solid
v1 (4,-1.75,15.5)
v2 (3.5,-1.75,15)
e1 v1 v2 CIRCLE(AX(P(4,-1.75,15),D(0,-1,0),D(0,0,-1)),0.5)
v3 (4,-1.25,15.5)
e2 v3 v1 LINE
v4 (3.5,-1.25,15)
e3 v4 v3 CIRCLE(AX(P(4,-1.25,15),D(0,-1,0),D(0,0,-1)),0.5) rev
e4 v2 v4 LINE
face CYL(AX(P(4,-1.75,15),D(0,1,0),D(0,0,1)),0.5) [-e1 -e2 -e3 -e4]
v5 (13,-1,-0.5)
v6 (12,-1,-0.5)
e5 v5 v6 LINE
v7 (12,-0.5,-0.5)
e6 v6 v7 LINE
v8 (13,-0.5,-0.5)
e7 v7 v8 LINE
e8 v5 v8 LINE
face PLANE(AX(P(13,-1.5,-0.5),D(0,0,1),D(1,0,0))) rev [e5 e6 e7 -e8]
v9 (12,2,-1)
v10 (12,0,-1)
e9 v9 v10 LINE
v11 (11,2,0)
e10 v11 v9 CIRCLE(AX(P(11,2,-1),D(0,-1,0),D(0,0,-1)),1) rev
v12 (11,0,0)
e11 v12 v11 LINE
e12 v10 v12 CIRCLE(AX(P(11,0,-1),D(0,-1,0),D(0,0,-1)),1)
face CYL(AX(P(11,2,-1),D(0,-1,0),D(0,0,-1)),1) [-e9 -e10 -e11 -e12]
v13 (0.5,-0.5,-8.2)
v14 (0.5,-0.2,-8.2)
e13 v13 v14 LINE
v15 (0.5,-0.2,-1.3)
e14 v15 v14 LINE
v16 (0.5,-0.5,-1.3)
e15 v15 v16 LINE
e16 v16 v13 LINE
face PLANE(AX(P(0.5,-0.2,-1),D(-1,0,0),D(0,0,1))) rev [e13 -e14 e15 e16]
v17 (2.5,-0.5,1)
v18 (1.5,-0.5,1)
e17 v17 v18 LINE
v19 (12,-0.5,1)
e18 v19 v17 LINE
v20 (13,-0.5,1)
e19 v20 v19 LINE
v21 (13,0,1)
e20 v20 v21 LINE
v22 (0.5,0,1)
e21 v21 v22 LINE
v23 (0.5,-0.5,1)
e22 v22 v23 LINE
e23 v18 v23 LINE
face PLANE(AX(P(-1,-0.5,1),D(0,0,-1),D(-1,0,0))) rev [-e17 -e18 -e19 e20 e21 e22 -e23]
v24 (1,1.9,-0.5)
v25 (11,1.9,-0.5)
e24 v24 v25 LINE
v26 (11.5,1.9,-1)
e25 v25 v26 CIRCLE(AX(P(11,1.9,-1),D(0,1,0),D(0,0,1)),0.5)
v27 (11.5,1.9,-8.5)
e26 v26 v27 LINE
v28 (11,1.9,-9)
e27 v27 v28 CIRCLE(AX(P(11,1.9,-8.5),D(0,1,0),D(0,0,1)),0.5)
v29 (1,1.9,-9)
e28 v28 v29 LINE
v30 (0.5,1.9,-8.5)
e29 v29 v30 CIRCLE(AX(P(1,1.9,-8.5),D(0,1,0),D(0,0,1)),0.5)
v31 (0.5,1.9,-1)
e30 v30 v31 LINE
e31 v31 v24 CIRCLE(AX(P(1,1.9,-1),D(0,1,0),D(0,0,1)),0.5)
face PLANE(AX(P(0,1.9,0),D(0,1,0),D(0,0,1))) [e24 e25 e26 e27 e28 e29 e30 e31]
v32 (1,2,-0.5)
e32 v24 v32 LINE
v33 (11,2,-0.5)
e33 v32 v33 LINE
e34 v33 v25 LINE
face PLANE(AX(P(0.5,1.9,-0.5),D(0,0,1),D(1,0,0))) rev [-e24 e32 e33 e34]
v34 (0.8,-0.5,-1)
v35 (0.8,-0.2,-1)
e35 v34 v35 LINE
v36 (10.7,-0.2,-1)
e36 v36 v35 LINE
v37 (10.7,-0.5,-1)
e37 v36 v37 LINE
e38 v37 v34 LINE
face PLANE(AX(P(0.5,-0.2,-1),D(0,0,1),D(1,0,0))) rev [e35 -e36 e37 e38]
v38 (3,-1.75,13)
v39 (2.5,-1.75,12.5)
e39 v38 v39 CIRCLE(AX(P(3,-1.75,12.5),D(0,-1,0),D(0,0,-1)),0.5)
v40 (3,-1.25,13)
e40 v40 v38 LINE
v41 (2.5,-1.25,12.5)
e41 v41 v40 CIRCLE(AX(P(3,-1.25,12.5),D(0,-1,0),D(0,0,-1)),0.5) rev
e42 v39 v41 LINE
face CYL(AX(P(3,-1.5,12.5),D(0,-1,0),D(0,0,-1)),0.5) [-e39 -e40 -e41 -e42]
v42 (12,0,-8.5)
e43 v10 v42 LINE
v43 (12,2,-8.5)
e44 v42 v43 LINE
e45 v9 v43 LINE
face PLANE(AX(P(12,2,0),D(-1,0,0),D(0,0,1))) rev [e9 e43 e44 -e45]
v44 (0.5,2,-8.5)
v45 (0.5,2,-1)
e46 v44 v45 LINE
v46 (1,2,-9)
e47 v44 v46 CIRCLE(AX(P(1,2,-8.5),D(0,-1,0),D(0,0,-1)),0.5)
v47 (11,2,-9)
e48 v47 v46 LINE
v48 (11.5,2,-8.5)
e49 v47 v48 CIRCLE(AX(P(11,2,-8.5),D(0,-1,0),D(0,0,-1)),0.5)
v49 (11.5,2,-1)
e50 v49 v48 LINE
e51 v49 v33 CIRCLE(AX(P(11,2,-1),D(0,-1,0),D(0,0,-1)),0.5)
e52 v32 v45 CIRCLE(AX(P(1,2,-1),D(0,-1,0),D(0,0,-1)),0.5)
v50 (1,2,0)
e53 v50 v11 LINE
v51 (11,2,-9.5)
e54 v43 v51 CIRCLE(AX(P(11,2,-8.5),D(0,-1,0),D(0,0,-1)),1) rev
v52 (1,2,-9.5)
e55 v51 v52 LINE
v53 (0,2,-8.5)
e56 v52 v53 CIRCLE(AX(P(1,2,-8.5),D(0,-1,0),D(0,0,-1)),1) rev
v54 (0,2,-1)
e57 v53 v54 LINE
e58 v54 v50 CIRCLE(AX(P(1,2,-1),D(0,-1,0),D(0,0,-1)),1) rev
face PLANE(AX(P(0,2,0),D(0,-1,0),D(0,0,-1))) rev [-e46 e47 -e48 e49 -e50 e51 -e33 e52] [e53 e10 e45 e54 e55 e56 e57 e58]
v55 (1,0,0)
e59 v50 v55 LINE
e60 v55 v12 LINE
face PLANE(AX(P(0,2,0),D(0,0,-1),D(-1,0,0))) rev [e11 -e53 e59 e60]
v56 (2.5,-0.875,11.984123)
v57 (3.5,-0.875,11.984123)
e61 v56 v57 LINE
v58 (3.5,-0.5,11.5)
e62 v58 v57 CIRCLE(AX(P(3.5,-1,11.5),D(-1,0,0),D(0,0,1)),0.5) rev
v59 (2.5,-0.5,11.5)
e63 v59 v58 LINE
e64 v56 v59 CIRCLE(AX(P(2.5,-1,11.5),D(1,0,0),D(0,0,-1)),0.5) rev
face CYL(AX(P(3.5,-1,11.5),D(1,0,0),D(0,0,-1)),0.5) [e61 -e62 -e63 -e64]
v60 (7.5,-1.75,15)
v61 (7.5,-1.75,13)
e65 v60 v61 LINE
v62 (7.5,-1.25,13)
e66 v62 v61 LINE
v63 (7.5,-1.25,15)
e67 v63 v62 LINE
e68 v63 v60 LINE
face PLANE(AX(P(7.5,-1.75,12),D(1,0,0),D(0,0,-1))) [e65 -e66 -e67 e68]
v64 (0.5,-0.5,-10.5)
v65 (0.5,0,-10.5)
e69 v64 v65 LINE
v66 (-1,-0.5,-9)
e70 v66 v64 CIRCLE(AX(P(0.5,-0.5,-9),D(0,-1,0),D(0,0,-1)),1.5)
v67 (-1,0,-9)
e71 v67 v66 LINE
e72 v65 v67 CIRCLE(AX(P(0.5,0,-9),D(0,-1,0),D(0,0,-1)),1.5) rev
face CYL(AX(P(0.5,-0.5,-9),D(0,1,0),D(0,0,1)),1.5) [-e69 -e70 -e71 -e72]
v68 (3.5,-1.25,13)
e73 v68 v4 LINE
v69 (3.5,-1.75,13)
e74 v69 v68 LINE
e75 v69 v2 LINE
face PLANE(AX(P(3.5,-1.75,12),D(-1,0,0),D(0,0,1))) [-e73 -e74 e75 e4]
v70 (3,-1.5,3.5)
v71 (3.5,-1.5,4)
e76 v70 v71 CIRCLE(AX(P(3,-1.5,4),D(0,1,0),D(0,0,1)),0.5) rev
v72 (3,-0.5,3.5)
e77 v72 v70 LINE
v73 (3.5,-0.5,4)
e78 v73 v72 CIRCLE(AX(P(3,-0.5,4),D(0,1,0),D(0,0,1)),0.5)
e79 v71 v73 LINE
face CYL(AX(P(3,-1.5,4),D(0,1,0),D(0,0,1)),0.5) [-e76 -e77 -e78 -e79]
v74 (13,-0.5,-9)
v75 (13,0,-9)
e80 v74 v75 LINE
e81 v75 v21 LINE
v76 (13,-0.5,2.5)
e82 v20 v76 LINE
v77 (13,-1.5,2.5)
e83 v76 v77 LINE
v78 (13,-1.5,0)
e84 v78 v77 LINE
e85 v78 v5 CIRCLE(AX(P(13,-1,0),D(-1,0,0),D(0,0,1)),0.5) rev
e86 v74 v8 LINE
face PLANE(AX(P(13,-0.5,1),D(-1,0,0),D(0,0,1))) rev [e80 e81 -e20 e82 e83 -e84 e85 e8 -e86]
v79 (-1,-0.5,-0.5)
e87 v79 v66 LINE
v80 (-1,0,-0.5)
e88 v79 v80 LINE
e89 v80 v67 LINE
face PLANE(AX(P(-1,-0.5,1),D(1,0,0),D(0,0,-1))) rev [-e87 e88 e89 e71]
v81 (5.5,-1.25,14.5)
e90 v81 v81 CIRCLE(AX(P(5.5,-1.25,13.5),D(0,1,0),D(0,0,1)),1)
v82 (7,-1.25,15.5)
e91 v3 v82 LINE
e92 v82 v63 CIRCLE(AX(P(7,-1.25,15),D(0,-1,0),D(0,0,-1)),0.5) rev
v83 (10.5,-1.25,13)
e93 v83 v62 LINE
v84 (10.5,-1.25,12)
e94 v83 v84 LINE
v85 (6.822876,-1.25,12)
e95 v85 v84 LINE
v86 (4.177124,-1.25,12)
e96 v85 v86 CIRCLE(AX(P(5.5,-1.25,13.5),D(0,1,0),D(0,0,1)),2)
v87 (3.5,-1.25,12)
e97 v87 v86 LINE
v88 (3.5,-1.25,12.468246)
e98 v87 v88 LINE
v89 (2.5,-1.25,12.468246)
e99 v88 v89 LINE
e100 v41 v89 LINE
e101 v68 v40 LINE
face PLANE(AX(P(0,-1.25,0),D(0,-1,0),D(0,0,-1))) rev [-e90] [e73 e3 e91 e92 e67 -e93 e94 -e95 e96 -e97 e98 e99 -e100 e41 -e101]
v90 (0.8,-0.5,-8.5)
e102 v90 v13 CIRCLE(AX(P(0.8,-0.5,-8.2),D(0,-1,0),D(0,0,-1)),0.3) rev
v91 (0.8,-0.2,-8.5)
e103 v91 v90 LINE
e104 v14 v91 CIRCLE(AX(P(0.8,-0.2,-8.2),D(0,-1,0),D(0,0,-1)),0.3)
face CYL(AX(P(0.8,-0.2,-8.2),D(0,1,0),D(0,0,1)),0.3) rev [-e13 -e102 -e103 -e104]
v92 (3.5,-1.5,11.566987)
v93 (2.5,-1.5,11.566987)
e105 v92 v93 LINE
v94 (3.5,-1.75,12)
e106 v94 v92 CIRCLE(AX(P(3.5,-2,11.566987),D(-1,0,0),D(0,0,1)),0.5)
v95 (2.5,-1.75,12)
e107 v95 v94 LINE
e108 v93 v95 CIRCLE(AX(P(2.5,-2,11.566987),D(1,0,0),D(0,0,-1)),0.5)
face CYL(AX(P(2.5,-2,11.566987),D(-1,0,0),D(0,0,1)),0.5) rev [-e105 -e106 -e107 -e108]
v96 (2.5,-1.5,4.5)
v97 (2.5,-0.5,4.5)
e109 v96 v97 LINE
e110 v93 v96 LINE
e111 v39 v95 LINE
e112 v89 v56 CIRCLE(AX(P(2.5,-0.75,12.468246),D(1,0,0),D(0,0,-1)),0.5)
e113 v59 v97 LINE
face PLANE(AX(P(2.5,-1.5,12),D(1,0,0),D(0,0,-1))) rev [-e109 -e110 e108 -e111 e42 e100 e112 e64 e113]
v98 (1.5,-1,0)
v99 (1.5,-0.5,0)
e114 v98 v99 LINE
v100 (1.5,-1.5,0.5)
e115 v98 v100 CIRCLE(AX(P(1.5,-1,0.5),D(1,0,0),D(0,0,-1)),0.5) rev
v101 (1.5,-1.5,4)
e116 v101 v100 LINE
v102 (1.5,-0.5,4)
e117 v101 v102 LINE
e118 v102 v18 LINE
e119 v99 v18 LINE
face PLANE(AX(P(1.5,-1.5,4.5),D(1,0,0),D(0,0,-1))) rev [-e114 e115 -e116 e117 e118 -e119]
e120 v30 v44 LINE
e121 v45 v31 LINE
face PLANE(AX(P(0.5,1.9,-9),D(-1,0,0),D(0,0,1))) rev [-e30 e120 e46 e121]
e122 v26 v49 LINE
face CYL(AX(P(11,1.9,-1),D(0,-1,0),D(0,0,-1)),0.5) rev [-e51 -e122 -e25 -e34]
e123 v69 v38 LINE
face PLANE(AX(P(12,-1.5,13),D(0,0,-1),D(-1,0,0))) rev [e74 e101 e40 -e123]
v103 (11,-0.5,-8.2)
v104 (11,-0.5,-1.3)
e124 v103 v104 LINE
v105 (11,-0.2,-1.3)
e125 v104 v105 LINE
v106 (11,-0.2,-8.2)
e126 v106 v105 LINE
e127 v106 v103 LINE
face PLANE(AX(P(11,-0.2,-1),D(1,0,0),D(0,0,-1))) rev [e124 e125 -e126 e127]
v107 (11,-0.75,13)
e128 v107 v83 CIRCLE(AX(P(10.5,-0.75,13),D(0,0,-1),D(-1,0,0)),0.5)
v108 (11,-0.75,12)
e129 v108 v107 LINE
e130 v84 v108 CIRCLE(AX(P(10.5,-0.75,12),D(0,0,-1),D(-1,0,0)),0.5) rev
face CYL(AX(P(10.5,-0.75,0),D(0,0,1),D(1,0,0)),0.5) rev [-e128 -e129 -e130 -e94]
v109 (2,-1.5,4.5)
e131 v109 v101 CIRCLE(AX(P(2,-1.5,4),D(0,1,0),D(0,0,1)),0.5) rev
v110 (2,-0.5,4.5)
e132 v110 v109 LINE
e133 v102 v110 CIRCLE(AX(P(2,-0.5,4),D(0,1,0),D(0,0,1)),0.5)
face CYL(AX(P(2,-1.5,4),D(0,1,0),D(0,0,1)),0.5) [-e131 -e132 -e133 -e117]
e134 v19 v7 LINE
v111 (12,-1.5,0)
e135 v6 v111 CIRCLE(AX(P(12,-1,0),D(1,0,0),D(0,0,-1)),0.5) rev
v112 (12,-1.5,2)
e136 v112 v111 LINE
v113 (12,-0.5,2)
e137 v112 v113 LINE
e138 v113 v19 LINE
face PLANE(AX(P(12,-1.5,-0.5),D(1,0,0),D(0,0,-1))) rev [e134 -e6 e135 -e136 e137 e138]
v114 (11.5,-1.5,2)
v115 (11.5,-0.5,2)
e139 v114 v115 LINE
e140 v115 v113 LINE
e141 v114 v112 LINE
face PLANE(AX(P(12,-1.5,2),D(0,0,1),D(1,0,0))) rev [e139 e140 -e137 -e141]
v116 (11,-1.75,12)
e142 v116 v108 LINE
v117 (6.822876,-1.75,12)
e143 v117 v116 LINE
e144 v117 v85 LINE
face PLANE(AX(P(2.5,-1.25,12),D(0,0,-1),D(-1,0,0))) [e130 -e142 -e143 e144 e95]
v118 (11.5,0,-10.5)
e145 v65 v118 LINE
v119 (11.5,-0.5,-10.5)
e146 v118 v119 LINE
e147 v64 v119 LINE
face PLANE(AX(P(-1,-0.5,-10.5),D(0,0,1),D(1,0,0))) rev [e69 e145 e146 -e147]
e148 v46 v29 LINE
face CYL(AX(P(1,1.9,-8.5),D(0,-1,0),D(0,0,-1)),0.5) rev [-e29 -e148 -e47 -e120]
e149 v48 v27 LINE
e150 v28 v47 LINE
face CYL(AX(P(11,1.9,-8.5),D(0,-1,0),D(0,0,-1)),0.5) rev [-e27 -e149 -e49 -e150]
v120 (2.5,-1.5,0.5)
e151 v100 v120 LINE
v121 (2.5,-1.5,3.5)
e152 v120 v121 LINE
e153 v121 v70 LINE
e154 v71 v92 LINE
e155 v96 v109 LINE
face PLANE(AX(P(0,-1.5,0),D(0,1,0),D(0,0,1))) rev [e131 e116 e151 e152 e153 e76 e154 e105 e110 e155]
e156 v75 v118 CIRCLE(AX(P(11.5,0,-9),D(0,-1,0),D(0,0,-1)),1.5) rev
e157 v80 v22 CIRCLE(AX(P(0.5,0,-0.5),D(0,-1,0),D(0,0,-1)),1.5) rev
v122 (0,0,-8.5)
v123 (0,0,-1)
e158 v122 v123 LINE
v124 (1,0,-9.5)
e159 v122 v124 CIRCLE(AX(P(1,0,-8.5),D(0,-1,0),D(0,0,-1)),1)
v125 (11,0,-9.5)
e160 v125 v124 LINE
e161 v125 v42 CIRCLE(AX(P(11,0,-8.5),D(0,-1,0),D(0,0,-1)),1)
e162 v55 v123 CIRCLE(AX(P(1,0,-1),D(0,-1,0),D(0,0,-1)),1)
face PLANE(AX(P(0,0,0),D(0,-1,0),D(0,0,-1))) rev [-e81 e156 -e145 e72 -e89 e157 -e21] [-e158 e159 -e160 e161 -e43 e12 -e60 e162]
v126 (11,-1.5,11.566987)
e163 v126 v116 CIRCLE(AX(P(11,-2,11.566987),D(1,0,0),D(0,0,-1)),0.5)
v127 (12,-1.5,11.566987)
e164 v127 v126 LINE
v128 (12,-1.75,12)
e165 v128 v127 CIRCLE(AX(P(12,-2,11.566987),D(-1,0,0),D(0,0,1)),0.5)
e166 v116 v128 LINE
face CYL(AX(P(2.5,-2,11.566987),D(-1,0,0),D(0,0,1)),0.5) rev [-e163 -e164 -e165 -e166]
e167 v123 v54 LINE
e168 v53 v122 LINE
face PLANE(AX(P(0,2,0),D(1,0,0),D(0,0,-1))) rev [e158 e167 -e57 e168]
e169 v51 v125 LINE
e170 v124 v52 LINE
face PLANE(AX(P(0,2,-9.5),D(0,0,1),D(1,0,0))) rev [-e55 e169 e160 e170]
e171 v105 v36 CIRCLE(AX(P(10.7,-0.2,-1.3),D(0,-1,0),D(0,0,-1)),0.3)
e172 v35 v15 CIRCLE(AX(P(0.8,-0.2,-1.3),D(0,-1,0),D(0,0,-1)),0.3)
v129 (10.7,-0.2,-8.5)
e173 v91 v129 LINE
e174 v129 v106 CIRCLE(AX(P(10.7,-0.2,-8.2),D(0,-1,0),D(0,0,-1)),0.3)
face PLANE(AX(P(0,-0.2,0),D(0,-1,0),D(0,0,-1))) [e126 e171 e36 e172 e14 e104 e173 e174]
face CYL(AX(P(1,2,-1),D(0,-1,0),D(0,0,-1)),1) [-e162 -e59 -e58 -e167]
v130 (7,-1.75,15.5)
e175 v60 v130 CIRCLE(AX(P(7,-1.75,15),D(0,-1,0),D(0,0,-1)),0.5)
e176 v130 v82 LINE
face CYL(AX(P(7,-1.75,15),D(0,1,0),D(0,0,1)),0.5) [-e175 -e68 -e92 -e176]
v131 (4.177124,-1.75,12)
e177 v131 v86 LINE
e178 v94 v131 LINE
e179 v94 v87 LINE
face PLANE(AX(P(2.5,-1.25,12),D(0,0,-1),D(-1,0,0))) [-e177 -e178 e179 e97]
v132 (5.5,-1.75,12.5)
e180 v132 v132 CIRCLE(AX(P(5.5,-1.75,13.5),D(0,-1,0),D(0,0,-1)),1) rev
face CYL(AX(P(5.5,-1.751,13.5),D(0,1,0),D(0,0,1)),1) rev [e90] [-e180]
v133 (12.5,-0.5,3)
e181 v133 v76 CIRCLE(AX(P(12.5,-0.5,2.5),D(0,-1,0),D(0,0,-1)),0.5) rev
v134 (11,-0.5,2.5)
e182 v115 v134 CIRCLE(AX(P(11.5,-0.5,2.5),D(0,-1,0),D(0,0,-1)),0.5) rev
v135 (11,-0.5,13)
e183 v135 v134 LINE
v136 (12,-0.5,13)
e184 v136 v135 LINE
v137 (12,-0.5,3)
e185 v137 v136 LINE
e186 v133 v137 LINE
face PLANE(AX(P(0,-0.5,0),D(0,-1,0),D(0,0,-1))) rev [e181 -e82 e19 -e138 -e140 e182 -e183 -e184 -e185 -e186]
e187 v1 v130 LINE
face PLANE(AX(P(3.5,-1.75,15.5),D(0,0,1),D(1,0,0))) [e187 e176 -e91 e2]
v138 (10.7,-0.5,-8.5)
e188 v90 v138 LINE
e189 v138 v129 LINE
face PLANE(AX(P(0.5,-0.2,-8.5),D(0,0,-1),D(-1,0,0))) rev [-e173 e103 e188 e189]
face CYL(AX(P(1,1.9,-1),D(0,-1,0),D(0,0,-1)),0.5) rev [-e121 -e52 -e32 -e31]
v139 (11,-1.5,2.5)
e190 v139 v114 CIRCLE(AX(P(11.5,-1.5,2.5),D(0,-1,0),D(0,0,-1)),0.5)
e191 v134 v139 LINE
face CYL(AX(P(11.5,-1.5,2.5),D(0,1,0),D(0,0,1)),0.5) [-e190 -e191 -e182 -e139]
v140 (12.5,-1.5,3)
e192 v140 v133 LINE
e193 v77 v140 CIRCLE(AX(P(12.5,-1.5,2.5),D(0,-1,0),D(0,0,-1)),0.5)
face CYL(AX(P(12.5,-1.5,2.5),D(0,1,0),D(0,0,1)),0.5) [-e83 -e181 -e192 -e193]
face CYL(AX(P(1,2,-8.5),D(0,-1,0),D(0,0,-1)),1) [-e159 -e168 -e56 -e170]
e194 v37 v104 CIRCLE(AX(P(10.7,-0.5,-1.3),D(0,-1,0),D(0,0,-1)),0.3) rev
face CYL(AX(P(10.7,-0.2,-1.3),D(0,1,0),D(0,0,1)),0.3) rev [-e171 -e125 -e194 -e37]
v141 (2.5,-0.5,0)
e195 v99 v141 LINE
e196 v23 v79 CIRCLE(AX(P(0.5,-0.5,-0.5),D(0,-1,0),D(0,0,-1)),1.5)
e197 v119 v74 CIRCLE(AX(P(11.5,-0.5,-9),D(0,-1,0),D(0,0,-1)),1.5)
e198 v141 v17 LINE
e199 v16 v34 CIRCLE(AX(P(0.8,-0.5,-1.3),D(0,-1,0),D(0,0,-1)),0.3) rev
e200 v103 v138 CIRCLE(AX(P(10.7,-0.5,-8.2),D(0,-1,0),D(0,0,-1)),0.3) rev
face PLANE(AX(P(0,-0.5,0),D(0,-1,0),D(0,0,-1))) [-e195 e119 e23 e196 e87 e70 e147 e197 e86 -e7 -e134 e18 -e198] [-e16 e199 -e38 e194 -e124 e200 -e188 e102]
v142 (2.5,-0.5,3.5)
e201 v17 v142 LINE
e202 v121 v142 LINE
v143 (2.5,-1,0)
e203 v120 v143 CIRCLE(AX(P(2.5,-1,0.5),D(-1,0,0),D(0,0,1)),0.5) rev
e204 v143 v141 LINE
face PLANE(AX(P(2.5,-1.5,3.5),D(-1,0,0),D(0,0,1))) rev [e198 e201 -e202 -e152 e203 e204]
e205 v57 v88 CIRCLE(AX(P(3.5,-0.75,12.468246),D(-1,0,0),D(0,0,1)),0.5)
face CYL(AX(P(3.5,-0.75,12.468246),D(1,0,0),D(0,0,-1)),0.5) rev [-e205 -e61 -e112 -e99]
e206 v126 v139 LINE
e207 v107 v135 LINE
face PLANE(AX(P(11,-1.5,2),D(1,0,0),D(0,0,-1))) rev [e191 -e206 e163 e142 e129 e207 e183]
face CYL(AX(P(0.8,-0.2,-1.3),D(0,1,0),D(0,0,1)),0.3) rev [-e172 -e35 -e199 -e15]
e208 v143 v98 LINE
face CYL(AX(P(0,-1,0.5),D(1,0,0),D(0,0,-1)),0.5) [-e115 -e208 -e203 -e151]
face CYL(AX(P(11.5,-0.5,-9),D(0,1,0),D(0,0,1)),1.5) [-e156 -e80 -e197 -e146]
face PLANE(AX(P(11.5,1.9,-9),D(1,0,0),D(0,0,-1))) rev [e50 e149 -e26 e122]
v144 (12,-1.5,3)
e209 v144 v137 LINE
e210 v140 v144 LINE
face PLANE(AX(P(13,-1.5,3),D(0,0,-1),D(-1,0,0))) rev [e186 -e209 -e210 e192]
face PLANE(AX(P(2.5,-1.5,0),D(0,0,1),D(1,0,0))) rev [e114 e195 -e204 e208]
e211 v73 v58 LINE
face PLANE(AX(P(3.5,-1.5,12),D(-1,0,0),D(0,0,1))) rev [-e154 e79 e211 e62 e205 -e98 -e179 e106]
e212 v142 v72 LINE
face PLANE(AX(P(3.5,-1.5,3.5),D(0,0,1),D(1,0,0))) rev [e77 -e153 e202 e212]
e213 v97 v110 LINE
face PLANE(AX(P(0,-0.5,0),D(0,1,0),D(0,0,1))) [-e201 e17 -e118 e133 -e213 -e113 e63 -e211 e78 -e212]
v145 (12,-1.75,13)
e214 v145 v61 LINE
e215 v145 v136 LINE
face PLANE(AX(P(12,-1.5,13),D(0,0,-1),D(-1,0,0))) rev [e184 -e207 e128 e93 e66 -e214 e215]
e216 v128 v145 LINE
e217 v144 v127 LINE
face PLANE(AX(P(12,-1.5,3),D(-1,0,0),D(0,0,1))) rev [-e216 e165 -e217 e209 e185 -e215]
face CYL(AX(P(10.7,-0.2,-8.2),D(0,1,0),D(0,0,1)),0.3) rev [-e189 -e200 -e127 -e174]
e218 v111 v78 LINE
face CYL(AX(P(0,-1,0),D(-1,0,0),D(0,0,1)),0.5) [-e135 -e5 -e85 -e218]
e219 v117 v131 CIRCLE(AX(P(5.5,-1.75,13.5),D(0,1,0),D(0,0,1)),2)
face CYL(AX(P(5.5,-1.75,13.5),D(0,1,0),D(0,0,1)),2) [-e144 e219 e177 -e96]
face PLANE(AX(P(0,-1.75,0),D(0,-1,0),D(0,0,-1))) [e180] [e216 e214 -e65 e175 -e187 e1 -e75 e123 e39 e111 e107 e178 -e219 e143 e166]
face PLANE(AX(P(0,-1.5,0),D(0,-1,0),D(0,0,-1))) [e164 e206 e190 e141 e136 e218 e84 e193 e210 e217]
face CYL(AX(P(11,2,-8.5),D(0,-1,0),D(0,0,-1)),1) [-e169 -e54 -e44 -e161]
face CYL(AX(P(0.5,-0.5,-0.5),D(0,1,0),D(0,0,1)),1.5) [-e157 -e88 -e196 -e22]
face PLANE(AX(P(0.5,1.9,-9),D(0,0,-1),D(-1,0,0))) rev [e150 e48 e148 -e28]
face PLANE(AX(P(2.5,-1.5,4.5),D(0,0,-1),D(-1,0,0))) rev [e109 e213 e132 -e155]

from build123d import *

# Parameters (mm, degrees)
SKETCH1_W                = 12
SKETCH1_H                = 9.5
BOSS_EXTRUDE1_DEPTH      = 2
SKETCH2_W                = 11
SKETCH2_H                = 8.5
CUT_EXTRUDE1_DEPTH       = 0.1
FILLET1_R                = 0.5
FILLET2_R                = 1
SKETCH3_W                = 14
SKETCH3_H                = 11.5
BOSS_EXTRUDE2_DEPTH      = 0.5
BOSS_EXTRUDE5_DEPTH      = 1
BOSS_EXTRUDE6_DEPTH      = 0.25
BOSS_EXTRUDE6_DEPTH_BACK = 0.25
SKETCH7_W                = 9.5
SKETCH7_H                = 1
BOSS_EXTRUDE7_DEPTH      = 0.5
CUT_EXTRUDE2_REACH       = 22.489
SKETCH10_R               = 1
FILLET4_R                = 0.5
FILLET5_R                = 0.5
FILLET6_R                = 1.5
SKETCH11_W               = 10.5
SKETCH11_H               = 7.5
CUT_EXTRUDE3_DEPTH       = 0.3
FILLET7_R                = 0.3


with BuildPart() as part:
    # Sketch1 → Boss-Extrude1 (new body)
    with BuildSketch(Plane(origin=(0, 0, 0), x_dir=(1, 0, 0), z_dir=(0, 1, 0))):
        with Locations((6, 4.75)):
            Rectangle(SKETCH1_W, SKETCH1_H)
    extrude(amount=BOSS_EXTRUDE1_DEPTH)

    # Sketch2 → Cut-Extrude1 (cut)
    with BuildSketch(Plane(origin=(0, 2, 0), x_dir=(1, 0, 0), z_dir=(0, 1, 0))):
        with Locations((6, 4.75)):
            Rectangle(SKETCH2_W, SKETCH2_H)
    extrude(amount=-CUT_EXTRUDE1_DEPTH, mode=Mode.SUBTRACT)

    # Fillet1
    fillet1_edges = [part.edges().sort_by_distance(p)[0] for p in [
        (0.5, 1.95, -0.5),
        (0.5, 1.95, -9),
        (11.5, 1.95, -9),
        (11.5, 1.95, -0.5),
    ]]
    fillet(fillet1_edges, radius=FILLET1_R)

    # Fillet2
    fillet2_edges = [part.edges().sort_by_distance(p)[0] for p in [
        (0, 1, -9.5),
        (12, 1, -9.5),
        (12, 1, 0),
        (0, 1, 0),
    ]]
    fillet(fillet2_edges, radius=FILLET2_R)

    # Sketch3 → Boss-Extrude2 (add)
    with BuildSketch(Plane.XZ):
        with Locations((6, -4.75)):
            Rectangle(SKETCH3_W, SKETCH3_H)
    extrude(amount=BOSS_EXTRUDE2_DEPTH)

    # Sketch6 → Boss-Extrude5 (add)
    with BuildSketch(Plane.XZ.offset(0.5)):
        Polygon((13, -0.5), (12, -0.5), (12, 2), (11, 2), (11, 13), (12, 13), (12, 3), (13, 3), align=None)
        Polygon((3.5, 12), (2.5, 12), (2.5, 4.5), (1.5, 4.5), (1.5, 0), (2.5, 0), (2.5, 3.5), (3.5, 3.5), align=None)
    extrude(amount=BOSS_EXTRUDE5_DEPTH)

    # Sketch7 → Boss-Extrude6 (add, two sides: drawn at the far end of the back side and taken through both)
    with BuildSketch(Plane.XZ.offset(1.5).offset(-BOSS_EXTRUDE6_DEPTH_BACK)):
        with Locations((7.25, 12.5)):
            Rectangle(SKETCH7_W, SKETCH7_H)
    extrude(amount=BOSS_EXTRUDE6_DEPTH + BOSS_EXTRUDE6_DEPTH_BACK)

    # Sketch9 → Boss-Extrude7 (add)
    with BuildSketch(Plane(origin=(0, -1.25, 0), x_dir=(1, 0, 0), z_dir=(0, 1, 0))):
        with BuildLine():
            Line((6.822875656, -12), (7.5, -12))
            Line((7.5, -12), (7.5, -15.5))
            Line((7.5, -15.5), (3.5, -15.5))
            Line((3.5, -15.5), (3.5, -12))
            Line((3.5, -12), (4.177124344, -12))
            ThreePointArc((4.177124344, -12), (5.5, -11.5), (6.822875656, -12))
        make_face()
    extrude(amount=-BOSS_EXTRUDE7_DEPTH)

    # Sketch10 → Cut-Extrude2 (cut, up to next)
    with BuildSketch(Plane(origin=(0, -1.25, 0), x_dir=(1, 0, 0), z_dir=(0, 1, 0)), mode=Mode.PRIVATE) as cut_extrude2_sk1:
        with Locations(Location((5.5, -13.5, 0), (0, 0, 270))):
            Circle(SKETCH10_R)
    cut_extrude2_tool1 = extrude(cut_extrude2_sk1.sketch, amount=-CUT_EXTRUDE2_REACH, mode=Mode.PRIVATE) & part.part
    add(cut_extrude2_tool1.solids().sort_by_distance((5.5, -1.25, 13.5))[0], mode=Mode.SUBTRACT)

    # Fillet4
    # the kernel refuses this fillet: 0.5 mm, written as the material it adds along each edge
    with BuildSketch(Plane(origin=(11, -1.25, 13), x_dir=(0, 1, 0), z_dir=(0, 0, -1))) as fillet4_piece_1:
        with BuildLine():
            CenterArc((FILLET4_R, -FILLET4_R), FILLET4_R, 90, 90)
            Line((0, -FILLET4_R), (0, 0))
            Line((0, 0), (FILLET4_R, 0))
        make_face()
    extrude(amount=1)
    with BuildSketch(Plane(origin=(3.5, -1.5, 12), x_dir=(0, 0, -1), z_dir=(-1, 0, 0))) as fillet4_piece_2:
        with BuildLine():
            CenterArc((0.433012702, 0.5), FILLET4_R, 210, 60)
            Line((0, 0.25), (0, 0))
            Line((0, 0), (0.433012702, 0))
        make_face()
    extrude(amount=1)
    # the kernel refuses this fillet: 0.5 mm, written as the material it takes off along each edge
    with BuildSketch(Plane(origin=(13, 0.75, 3), x_dir=(-1, 0, 0), z_dir=(0, -1, 0)), Plane(origin=(11, 0.75, 2), x_dir=(1, 0, 0), z_dir=(0, -1, 0)), Plane(origin=(14.25, -1.5, -0.5), x_dir=(0, 0, 1), z_dir=(-1, 0, 0)), Plane(origin=(3.5, 0.75, 3.5), x_dir=(0, 0, 1), z_dir=(0, -1, 0))) as fillet4_2_piece_1:
        with BuildLine():
            CenterArc((FILLET4_R, FILLET4_R), FILLET4_R, 180, 90)
            Line((0, FILLET4_R), (0, 0))
            Line((0, 0), (FILLET4_R, 0))
        make_face()
    extrude(amount=3.5, mode=Mode.SUBTRACT)
    with BuildSketch(Plane(origin=(4.75, -0.5, 12), x_dir=(0, -1, 0), z_dir=(-1, 0, 0)), Plane(origin=(1.5, 0.75, 4.5), x_dir=(1, 0, 0), z_dir=(0, -1, 0)), Plane(origin=(0.25, -1.5, 0), x_dir=(0, 0, 1), z_dir=(1, 0, 0))) as fillet4_2_piece_2:
        with BuildLine():
            CenterArc((FILLET4_R, -FILLET4_R), FILLET4_R, 90, 90)
            Line((0, -FILLET4_R), (0, 0))
            Line((0, 0), (FILLET4_R, 0))
        make_face()
    extrude(amount=3.5, mode=Mode.SUBTRACT)
    with BuildSketch(Plane(origin=(2.5, 0, 13), x_dir=(0, 0, -1), z_dir=(0, -1, 0)), Plane(origin=(3.5, 0, 15.5), x_dir=(0, 0, -1), z_dir=(0, -1, 0)), Plane(origin=(7.5, 0, 15.5), x_dir=(-1, 0, 0), z_dir=(0, -1, 0))) as fillet4_2_piece_3:
        with BuildLine():
            CenterArc((FILLET4_R, FILLET4_R), FILLET4_R, 180, 90)
            Line((0, FILLET4_R), (0, 0))
            Line((0, 0), (FILLET4_R, 0))
        make_face()
    extrude(amount=3, mode=Mode.SUBTRACT)

    # Fillet5
    # the kernel refuses this fillet: 0.5 mm, written as the material it adds along each edge
    with BuildSketch(Plane(origin=(3.5, -1.25, 12), x_dir=(0, 0.9991049126334705, -0.04230098759681056), z_dir=(-1, 0, 0))) as fillet5_piece_1:
        with BuildLine():
            CenterArc((0.479745195, -0.488977209), FILLET5_R, 102.053120737, 75.522487814)
            Line((-0.019807261, -0.467826716), (-0.069762507, -0.465711666))
            Line((-0.069762507, -0.465711666), (-0.049955246, 0.002115049))
            Line((-0.049955246, 0.002115049), (0.002115049, 0.049955246))
            ThreePointArc((0.002115049, 0.049955246), (0.251891278, 0.039379999), (0.364895035, 0.048897721))
            Line((0.364895035, 0.048897721), (0.375335958, 0))
        make_face()
    extrude(amount=1)
    with BuildSketch(Plane(origin=(12, -1.5, 12), x_dir=(0, -1, 0), z_dir=(-1, 0, 0))) as fillet5_piece_2:
        with BuildLine():
            CenterArc((0.5, -0.433012702), FILLET5_R, 120, 60)
            Line((0, -0.433012702), (0, 0))
            Line((0, 0), (0.25, 0))
        make_face()
    extrude(amount=1)

    # Fillet6
    fillet6_edges = [part.edges().sort_by_distance(p)[0] for p in [
        (-1, -0.25, 1),
        (-1, -0.25, -10.5),
        (13, -0.25, -10.5),
    ]]
    fillet(fillet6_edges, radius=FILLET6_R)

    # Sketch11 → Cut-Extrude3 (cut)
    with BuildSketch(Plane.XZ.offset(0.5)):
        with Locations((5.75, -4.75)):
            Rectangle(SKETCH11_W, SKETCH11_H)
    extrude(amount=-CUT_EXTRUDE3_DEPTH, mode=Mode.SUBTRACT)

    # Fillet7
    fillet7_edges = [part.edges().sort_by_distance(p)[0] for p in [
        (0.5, -0.35, -8.5),
        (0.5, -0.35, -1),
        (11, -0.35, -1),
        (11, -0.35, -8.5),
    ]]
    fillet(fillet7_edges, radius=FILLET7_R)


solid = part.part
